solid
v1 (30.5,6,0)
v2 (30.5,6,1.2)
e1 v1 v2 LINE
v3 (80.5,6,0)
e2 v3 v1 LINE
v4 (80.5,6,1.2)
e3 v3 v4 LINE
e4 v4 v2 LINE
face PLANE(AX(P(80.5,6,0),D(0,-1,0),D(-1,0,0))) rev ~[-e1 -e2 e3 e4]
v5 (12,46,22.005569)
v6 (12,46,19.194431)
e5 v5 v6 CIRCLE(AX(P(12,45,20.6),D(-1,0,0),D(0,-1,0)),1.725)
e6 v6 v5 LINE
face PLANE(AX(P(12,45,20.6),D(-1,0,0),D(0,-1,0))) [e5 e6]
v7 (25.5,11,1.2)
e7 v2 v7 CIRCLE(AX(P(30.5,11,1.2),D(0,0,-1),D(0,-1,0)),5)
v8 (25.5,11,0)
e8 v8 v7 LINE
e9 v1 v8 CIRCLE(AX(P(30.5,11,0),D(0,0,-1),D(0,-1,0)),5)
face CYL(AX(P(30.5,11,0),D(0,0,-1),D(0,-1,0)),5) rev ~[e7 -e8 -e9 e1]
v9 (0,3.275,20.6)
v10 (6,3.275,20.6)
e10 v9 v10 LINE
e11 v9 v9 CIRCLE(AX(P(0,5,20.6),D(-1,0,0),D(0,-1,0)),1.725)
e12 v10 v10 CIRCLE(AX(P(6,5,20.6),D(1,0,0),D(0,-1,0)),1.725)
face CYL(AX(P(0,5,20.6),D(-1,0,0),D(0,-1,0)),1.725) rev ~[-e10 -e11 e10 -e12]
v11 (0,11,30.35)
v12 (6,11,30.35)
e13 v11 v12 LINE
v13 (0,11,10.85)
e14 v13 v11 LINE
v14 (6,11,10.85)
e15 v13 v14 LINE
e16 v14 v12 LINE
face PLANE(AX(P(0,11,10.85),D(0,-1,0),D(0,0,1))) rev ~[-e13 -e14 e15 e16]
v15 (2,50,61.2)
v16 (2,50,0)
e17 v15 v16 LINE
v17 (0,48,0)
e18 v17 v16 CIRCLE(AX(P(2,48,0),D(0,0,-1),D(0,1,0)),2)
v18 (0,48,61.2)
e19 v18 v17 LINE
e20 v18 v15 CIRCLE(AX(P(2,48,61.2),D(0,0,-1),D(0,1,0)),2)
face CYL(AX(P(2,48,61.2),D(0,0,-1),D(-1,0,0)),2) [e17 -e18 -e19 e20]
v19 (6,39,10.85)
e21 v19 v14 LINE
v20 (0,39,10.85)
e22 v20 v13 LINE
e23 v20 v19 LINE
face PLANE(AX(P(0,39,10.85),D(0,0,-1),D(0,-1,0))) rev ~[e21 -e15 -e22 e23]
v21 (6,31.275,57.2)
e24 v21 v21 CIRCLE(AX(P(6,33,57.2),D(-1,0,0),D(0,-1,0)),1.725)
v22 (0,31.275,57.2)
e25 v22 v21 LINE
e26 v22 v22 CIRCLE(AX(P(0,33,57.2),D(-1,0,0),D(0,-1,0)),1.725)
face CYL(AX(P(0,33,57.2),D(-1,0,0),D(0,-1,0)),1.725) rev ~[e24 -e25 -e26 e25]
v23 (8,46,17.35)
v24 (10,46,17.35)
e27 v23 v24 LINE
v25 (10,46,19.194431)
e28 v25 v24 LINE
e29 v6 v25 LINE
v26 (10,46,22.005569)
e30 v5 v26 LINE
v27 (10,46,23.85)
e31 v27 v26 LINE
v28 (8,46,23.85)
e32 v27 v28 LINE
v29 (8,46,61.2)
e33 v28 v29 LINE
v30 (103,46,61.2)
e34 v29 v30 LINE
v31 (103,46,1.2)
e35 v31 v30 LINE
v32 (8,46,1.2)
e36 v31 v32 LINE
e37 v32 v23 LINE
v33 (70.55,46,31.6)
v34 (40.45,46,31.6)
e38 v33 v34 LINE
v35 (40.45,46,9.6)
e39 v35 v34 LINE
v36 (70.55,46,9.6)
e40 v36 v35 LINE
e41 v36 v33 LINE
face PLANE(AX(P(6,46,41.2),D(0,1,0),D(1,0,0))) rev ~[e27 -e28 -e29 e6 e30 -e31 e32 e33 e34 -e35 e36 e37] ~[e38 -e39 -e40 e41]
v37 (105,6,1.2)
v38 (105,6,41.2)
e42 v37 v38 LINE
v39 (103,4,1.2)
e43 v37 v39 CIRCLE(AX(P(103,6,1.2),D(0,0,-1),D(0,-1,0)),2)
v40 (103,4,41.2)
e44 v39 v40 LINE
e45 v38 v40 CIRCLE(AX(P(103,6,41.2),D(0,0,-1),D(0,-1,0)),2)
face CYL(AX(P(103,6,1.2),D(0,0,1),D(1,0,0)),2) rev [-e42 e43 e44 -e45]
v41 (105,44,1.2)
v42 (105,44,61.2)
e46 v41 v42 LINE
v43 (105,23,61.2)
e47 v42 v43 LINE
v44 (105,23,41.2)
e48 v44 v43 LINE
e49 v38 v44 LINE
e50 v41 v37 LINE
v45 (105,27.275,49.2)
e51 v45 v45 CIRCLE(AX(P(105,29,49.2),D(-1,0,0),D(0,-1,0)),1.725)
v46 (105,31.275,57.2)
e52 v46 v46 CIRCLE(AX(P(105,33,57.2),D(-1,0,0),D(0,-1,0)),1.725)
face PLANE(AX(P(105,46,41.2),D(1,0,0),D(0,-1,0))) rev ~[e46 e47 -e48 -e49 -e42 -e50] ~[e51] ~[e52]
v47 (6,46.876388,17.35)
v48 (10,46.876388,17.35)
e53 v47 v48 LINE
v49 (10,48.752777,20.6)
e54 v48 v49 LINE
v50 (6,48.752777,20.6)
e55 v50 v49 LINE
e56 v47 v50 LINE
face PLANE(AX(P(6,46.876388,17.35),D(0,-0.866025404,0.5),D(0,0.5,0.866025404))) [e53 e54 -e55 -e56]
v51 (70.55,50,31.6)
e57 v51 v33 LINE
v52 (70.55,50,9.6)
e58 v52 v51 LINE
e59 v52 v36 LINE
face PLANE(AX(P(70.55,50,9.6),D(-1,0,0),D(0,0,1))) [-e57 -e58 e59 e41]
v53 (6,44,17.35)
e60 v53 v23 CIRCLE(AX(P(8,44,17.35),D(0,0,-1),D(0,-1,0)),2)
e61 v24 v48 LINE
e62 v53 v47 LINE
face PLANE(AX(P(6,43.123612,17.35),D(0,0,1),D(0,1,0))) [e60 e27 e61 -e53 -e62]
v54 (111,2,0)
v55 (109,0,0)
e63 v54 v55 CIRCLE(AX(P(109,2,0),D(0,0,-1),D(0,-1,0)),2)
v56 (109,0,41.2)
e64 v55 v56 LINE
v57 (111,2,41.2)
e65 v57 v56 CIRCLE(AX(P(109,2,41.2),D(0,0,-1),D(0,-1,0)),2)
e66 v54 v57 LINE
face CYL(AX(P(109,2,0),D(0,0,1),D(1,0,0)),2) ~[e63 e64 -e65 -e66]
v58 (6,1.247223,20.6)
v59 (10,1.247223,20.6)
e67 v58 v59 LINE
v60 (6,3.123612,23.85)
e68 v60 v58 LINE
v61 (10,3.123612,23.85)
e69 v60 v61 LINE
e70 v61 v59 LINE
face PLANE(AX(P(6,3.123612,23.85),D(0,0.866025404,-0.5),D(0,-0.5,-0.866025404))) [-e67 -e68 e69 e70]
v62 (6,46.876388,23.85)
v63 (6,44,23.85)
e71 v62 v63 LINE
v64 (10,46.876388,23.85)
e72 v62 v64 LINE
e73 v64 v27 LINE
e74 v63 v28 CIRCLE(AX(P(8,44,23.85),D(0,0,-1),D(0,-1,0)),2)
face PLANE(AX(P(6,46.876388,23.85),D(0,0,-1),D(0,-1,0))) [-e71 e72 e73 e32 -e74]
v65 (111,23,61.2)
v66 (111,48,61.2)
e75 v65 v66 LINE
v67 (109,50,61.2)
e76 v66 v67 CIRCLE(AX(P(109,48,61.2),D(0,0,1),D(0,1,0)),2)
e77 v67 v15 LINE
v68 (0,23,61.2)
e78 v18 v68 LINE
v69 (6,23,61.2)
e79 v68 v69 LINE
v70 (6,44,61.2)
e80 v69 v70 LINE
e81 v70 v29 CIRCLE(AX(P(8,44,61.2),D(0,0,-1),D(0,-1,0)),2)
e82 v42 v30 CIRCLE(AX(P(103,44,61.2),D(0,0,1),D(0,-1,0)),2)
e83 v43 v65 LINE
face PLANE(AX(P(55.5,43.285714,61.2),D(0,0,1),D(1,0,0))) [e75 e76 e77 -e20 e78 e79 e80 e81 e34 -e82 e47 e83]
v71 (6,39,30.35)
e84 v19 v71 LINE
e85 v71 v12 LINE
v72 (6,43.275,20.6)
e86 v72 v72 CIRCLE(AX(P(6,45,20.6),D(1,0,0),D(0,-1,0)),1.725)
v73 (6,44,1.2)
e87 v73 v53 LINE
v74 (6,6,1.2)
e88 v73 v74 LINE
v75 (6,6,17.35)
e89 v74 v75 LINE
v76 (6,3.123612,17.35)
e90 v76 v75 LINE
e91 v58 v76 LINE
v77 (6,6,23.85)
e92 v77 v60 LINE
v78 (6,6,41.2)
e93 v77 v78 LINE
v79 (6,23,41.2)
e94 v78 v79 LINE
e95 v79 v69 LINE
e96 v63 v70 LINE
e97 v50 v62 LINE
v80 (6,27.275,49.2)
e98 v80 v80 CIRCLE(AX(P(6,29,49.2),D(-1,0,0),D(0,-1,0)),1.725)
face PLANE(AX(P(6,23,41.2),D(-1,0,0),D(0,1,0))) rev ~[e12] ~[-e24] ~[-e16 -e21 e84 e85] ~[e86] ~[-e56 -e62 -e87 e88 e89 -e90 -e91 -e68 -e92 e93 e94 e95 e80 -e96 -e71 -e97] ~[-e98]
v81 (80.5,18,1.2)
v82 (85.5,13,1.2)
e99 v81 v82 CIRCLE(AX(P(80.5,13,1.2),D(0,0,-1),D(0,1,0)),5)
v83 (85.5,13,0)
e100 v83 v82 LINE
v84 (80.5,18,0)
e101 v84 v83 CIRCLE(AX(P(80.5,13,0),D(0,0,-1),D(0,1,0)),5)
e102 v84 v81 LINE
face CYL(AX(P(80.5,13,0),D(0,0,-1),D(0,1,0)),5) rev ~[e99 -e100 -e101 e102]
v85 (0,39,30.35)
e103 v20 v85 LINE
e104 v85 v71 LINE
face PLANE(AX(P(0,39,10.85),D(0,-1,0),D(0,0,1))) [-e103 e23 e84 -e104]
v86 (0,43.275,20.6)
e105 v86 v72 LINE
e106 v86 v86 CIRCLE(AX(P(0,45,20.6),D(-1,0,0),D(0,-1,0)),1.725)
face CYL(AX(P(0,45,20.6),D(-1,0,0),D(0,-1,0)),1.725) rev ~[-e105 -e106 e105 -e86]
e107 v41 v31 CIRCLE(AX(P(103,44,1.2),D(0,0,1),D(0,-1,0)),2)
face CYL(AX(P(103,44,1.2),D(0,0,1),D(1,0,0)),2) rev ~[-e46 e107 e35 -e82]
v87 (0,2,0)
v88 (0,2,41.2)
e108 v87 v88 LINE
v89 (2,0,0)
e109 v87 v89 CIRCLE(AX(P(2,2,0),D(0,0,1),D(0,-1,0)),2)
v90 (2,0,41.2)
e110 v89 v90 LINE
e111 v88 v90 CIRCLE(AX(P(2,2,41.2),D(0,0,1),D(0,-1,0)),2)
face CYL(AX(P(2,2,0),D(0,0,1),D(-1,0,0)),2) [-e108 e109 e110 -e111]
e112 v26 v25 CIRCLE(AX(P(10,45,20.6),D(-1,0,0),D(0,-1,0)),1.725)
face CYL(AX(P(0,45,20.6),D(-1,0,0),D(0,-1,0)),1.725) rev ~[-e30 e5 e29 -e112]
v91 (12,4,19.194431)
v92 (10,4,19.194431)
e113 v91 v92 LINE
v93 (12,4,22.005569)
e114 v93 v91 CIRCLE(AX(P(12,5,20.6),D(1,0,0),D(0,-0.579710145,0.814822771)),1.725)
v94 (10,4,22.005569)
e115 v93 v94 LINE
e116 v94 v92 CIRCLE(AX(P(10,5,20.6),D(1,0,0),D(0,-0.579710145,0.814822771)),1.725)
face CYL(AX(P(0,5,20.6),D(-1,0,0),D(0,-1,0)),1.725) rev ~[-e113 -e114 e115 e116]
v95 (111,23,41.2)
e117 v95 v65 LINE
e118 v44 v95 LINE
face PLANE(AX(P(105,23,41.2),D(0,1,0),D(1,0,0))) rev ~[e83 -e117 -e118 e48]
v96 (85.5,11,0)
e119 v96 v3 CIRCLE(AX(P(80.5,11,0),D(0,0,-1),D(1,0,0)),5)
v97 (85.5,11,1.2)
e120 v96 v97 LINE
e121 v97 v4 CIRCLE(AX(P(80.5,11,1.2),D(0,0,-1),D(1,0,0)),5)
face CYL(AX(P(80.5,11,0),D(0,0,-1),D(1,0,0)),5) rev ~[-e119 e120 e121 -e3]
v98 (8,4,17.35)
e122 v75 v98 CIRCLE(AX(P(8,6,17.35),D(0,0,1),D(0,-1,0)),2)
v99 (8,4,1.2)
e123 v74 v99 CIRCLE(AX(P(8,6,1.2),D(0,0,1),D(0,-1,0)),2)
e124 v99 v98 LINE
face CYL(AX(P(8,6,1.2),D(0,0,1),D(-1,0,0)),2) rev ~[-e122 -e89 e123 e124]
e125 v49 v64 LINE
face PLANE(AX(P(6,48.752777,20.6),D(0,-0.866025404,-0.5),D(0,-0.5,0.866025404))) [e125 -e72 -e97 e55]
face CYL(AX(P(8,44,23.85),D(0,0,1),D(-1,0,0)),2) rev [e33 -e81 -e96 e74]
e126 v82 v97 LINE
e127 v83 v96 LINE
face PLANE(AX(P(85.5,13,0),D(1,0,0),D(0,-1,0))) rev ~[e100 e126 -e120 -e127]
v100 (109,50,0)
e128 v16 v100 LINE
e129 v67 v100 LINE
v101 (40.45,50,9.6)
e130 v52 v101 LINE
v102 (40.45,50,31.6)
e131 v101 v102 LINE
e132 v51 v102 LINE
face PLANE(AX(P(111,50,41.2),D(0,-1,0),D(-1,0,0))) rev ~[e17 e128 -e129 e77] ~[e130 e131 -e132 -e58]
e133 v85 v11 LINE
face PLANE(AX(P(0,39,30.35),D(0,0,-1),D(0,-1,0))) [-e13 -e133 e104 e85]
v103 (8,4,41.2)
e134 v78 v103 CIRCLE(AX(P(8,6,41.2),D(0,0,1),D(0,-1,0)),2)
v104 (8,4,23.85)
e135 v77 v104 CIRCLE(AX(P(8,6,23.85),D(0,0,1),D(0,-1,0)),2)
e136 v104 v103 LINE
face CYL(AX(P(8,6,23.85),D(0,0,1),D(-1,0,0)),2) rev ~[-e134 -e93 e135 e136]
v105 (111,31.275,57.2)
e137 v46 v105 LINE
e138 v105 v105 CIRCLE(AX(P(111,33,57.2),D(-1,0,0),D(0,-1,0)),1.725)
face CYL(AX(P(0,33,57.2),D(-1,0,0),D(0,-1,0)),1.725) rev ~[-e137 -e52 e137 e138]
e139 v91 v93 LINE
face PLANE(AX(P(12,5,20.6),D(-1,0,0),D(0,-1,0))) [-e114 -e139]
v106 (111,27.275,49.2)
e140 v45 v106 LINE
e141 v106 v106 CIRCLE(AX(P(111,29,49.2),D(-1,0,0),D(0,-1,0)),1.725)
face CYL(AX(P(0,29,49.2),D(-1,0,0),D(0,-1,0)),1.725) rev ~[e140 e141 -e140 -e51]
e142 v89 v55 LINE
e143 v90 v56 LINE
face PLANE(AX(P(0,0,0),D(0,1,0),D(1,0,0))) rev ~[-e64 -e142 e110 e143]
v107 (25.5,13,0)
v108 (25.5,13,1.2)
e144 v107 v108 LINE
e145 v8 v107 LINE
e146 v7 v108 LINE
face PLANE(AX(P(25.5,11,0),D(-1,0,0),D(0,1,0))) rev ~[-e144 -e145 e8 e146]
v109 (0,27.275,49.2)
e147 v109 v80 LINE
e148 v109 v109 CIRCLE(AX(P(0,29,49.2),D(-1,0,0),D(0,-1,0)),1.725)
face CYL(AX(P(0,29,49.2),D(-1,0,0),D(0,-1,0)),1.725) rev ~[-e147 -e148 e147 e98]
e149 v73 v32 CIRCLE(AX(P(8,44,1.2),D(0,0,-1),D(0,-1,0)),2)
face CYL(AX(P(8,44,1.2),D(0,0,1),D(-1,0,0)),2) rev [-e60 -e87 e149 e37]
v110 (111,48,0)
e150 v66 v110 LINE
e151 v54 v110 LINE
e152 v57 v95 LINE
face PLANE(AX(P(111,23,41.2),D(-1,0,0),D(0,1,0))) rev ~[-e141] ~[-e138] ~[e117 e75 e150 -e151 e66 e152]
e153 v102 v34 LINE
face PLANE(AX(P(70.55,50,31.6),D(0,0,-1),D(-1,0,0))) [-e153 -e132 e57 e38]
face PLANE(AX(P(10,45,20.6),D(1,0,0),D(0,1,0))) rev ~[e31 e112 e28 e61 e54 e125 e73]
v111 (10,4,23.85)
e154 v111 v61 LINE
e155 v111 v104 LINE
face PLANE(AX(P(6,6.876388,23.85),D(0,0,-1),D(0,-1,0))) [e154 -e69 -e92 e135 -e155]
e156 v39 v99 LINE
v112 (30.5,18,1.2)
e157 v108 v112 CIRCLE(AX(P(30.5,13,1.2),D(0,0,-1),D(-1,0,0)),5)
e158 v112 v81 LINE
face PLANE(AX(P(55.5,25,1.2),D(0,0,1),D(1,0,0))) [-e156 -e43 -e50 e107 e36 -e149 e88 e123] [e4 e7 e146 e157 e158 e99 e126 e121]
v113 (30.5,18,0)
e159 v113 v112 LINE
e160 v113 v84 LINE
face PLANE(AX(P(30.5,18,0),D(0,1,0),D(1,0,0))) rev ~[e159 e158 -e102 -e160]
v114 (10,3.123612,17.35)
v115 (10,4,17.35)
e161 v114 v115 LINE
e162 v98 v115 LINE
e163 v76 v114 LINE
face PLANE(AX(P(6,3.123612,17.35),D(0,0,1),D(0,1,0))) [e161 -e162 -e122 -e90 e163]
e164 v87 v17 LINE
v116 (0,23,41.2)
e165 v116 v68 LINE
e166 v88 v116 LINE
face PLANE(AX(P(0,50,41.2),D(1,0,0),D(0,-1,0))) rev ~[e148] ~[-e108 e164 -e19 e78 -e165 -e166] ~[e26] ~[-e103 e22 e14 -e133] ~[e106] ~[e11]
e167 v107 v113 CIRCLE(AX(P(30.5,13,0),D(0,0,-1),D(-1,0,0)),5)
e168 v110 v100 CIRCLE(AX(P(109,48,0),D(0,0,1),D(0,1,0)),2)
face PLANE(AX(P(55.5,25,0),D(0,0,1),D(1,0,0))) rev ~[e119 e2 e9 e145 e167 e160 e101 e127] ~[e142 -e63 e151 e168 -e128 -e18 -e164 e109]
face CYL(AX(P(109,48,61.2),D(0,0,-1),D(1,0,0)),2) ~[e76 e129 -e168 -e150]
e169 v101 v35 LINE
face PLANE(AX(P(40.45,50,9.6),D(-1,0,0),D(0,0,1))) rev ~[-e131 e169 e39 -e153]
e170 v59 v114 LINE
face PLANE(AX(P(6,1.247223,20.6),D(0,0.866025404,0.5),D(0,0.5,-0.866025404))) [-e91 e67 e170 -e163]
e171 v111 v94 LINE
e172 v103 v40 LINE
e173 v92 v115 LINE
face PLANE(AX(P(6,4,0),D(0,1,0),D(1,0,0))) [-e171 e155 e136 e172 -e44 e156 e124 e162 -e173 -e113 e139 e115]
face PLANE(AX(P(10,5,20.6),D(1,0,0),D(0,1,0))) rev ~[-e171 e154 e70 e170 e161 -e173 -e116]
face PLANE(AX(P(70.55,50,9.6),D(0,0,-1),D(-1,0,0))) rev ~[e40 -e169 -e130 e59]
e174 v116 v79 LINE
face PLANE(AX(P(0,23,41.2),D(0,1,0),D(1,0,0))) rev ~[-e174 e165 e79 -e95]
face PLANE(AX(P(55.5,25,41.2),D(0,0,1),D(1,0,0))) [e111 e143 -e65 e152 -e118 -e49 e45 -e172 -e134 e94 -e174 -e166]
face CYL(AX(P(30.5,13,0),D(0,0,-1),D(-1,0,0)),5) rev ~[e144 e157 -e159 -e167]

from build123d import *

# Parameters (mm, degrees)
F0_W      = 111
F0_H      = 50
F0_W_2    = 99
F0_H_2    = 42
F1_DEPTH  = 1.2
F2_DEPTH  = 41.2
F3_W      = 30.1
F3_H      = 22
F4_DEPTH  = 4
F6_DEPTH  = 20
F7_R      = 1.725
F8_DEPTH  = 114.6
F7_W      = 28
F7_H      = 19.5
F9_DEPTH  = 12
F11_DEPTH = 4
F12_R     = 2


# Not quite as in the source:
# - a feature names something its author has since deleted; it is built from what else it names


with BuildPart() as f1:
    # F0 (on Top) → F1 (new body)
    with BuildSketch(Plane.XY):
        with Locations((55.5, 25)):
            Rectangle(F0_W, F0_H)
        with Locations((55.5, 25)):
            Rectangle(F0_W_2, F0_H_2, mode=Mode.SUBTRACT)
        with Locations((55.5, 25)):
            Rectangle(F0_W_2, F0_H_2)
        with BuildLine():
            ThreePointArc((25.5, 13), (26.9644660941, 16.5355339059), (30.5, 18))
            Line((30.5, 18), (80.5, 18))
            ThreePointArc((80.5, 18), (84.0355339059, 16.5355339059), (85.5, 13))
            Line((85.5, 13), (85.5, 11))
            ThreePointArc((85.5, 11), (84.0355339059, 7.4644660941), (80.5, 6))
            Line((80.5, 6), (30.5, 6))
            ThreePointArc((30.5, 6), (26.9644660941, 7.4644660941), (25.5, 11))
            Line((25.5, 11), (25.5, 13))
        make_face(mode=Mode.SUBTRACT)
    extrude(amount=F1_DEPTH)

    # F0 (on Top) → F2 (join)
    with BuildSketch(Plane.XY):
        with Locations((55.5, 25)):
            Rectangle(F0_W, F0_H)
        with Locations((55.5, 25)):
            Rectangle(F0_W_2, F0_H_2, mode=Mode.SUBTRACT)
    extrude(amount=F2_DEPTH)

    # F3 (on face) → F4 (cut)
    with BuildSketch(Plane(origin=(0, 50, 0), x_dir=(-1, 0, 0), z_dir=(0, 1, 0))):
        with Locations((-55.5, 20.6)):
            Rectangle(F3_W, F3_H)
    extrude(amount=-F4_DEPTH, mode=Mode.SUBTRACT)

    # F5 (on face) → F6 (join)
    with BuildSketch(Plane.XY.offset(41.2)):
        Polygon((0, 50), (0, 23), (6, 23), (6, 46), (105, 46), (105, 23), (111, 23), (111, 50), align=None)
    extrude(amount=F6_DEPTH)

    # F7 (on face) → F8 (cut)
    with BuildSketch(Plane(origin=(0, 0, 0), x_dir=(0, -1, 0), z_dir=(-1, 0, 0))):
        with Locations((-29, 49.2)):
            Circle(F7_R)
        with Locations((-33, 57.2)):
            Circle(F7_R)
    extrude(amount=-F8_DEPTH, mode=Mode.SUBTRACT)

    # F7 (on face) → F9 (cut)
    with BuildSketch(Plane(origin=(0, 0, 0), x_dir=(0, -1, 0), z_dir=(-1, 0, 0))):
        with Locations((-25, 20.6)):
            Rectangle(F7_W, F7_H)
        with Locations((-45, 20.6)):
            Circle(F7_R)
        with Locations((-5, 20.6)):
            Circle(F7_R)
    extrude(amount=-F9_DEPTH, mode=Mode.SUBTRACT)

    # F10 (on face) → F11 (cut)
    with BuildSketch(Plane.YZ.offset(6)):
        Polygon((8.7527767497, 20.6), (6.8763883749, 23.85), (3.1236116251, 23.85), (1.2472232503, 20.6), (3.1236116251, 17.35), (6.8763883749, 17.35), align=None)
        Polygon((43.1236116251, 23.85), (41.2472232503, 20.6), (43.1236116251, 17.35), (46.8763883749, 17.35), (48.7527767497, 20.6), (46.8763883749, 23.85), align=None)
    extrude(amount=F11_DEPTH, mode=Mode.SUBTRACT)

    # F12
    f12_edges = [f1.edges().sort_by_distance(p)[0] for p in [
        (6, 46, 42.525),
        (6, 46, 9.275),
        (105, 46, 31.2),
        (105, 4, 21.2),
        (6, 4, 32.525),
        (6, 4, 9.275),
        (111, 0, 20.6),
        (111, 50, 30.6),
        (0, 50, 30.6),
        (0, 0, 20.6),
    ]]
    fillet(f12_edges, radius=F12_R)


solid = f1.part
